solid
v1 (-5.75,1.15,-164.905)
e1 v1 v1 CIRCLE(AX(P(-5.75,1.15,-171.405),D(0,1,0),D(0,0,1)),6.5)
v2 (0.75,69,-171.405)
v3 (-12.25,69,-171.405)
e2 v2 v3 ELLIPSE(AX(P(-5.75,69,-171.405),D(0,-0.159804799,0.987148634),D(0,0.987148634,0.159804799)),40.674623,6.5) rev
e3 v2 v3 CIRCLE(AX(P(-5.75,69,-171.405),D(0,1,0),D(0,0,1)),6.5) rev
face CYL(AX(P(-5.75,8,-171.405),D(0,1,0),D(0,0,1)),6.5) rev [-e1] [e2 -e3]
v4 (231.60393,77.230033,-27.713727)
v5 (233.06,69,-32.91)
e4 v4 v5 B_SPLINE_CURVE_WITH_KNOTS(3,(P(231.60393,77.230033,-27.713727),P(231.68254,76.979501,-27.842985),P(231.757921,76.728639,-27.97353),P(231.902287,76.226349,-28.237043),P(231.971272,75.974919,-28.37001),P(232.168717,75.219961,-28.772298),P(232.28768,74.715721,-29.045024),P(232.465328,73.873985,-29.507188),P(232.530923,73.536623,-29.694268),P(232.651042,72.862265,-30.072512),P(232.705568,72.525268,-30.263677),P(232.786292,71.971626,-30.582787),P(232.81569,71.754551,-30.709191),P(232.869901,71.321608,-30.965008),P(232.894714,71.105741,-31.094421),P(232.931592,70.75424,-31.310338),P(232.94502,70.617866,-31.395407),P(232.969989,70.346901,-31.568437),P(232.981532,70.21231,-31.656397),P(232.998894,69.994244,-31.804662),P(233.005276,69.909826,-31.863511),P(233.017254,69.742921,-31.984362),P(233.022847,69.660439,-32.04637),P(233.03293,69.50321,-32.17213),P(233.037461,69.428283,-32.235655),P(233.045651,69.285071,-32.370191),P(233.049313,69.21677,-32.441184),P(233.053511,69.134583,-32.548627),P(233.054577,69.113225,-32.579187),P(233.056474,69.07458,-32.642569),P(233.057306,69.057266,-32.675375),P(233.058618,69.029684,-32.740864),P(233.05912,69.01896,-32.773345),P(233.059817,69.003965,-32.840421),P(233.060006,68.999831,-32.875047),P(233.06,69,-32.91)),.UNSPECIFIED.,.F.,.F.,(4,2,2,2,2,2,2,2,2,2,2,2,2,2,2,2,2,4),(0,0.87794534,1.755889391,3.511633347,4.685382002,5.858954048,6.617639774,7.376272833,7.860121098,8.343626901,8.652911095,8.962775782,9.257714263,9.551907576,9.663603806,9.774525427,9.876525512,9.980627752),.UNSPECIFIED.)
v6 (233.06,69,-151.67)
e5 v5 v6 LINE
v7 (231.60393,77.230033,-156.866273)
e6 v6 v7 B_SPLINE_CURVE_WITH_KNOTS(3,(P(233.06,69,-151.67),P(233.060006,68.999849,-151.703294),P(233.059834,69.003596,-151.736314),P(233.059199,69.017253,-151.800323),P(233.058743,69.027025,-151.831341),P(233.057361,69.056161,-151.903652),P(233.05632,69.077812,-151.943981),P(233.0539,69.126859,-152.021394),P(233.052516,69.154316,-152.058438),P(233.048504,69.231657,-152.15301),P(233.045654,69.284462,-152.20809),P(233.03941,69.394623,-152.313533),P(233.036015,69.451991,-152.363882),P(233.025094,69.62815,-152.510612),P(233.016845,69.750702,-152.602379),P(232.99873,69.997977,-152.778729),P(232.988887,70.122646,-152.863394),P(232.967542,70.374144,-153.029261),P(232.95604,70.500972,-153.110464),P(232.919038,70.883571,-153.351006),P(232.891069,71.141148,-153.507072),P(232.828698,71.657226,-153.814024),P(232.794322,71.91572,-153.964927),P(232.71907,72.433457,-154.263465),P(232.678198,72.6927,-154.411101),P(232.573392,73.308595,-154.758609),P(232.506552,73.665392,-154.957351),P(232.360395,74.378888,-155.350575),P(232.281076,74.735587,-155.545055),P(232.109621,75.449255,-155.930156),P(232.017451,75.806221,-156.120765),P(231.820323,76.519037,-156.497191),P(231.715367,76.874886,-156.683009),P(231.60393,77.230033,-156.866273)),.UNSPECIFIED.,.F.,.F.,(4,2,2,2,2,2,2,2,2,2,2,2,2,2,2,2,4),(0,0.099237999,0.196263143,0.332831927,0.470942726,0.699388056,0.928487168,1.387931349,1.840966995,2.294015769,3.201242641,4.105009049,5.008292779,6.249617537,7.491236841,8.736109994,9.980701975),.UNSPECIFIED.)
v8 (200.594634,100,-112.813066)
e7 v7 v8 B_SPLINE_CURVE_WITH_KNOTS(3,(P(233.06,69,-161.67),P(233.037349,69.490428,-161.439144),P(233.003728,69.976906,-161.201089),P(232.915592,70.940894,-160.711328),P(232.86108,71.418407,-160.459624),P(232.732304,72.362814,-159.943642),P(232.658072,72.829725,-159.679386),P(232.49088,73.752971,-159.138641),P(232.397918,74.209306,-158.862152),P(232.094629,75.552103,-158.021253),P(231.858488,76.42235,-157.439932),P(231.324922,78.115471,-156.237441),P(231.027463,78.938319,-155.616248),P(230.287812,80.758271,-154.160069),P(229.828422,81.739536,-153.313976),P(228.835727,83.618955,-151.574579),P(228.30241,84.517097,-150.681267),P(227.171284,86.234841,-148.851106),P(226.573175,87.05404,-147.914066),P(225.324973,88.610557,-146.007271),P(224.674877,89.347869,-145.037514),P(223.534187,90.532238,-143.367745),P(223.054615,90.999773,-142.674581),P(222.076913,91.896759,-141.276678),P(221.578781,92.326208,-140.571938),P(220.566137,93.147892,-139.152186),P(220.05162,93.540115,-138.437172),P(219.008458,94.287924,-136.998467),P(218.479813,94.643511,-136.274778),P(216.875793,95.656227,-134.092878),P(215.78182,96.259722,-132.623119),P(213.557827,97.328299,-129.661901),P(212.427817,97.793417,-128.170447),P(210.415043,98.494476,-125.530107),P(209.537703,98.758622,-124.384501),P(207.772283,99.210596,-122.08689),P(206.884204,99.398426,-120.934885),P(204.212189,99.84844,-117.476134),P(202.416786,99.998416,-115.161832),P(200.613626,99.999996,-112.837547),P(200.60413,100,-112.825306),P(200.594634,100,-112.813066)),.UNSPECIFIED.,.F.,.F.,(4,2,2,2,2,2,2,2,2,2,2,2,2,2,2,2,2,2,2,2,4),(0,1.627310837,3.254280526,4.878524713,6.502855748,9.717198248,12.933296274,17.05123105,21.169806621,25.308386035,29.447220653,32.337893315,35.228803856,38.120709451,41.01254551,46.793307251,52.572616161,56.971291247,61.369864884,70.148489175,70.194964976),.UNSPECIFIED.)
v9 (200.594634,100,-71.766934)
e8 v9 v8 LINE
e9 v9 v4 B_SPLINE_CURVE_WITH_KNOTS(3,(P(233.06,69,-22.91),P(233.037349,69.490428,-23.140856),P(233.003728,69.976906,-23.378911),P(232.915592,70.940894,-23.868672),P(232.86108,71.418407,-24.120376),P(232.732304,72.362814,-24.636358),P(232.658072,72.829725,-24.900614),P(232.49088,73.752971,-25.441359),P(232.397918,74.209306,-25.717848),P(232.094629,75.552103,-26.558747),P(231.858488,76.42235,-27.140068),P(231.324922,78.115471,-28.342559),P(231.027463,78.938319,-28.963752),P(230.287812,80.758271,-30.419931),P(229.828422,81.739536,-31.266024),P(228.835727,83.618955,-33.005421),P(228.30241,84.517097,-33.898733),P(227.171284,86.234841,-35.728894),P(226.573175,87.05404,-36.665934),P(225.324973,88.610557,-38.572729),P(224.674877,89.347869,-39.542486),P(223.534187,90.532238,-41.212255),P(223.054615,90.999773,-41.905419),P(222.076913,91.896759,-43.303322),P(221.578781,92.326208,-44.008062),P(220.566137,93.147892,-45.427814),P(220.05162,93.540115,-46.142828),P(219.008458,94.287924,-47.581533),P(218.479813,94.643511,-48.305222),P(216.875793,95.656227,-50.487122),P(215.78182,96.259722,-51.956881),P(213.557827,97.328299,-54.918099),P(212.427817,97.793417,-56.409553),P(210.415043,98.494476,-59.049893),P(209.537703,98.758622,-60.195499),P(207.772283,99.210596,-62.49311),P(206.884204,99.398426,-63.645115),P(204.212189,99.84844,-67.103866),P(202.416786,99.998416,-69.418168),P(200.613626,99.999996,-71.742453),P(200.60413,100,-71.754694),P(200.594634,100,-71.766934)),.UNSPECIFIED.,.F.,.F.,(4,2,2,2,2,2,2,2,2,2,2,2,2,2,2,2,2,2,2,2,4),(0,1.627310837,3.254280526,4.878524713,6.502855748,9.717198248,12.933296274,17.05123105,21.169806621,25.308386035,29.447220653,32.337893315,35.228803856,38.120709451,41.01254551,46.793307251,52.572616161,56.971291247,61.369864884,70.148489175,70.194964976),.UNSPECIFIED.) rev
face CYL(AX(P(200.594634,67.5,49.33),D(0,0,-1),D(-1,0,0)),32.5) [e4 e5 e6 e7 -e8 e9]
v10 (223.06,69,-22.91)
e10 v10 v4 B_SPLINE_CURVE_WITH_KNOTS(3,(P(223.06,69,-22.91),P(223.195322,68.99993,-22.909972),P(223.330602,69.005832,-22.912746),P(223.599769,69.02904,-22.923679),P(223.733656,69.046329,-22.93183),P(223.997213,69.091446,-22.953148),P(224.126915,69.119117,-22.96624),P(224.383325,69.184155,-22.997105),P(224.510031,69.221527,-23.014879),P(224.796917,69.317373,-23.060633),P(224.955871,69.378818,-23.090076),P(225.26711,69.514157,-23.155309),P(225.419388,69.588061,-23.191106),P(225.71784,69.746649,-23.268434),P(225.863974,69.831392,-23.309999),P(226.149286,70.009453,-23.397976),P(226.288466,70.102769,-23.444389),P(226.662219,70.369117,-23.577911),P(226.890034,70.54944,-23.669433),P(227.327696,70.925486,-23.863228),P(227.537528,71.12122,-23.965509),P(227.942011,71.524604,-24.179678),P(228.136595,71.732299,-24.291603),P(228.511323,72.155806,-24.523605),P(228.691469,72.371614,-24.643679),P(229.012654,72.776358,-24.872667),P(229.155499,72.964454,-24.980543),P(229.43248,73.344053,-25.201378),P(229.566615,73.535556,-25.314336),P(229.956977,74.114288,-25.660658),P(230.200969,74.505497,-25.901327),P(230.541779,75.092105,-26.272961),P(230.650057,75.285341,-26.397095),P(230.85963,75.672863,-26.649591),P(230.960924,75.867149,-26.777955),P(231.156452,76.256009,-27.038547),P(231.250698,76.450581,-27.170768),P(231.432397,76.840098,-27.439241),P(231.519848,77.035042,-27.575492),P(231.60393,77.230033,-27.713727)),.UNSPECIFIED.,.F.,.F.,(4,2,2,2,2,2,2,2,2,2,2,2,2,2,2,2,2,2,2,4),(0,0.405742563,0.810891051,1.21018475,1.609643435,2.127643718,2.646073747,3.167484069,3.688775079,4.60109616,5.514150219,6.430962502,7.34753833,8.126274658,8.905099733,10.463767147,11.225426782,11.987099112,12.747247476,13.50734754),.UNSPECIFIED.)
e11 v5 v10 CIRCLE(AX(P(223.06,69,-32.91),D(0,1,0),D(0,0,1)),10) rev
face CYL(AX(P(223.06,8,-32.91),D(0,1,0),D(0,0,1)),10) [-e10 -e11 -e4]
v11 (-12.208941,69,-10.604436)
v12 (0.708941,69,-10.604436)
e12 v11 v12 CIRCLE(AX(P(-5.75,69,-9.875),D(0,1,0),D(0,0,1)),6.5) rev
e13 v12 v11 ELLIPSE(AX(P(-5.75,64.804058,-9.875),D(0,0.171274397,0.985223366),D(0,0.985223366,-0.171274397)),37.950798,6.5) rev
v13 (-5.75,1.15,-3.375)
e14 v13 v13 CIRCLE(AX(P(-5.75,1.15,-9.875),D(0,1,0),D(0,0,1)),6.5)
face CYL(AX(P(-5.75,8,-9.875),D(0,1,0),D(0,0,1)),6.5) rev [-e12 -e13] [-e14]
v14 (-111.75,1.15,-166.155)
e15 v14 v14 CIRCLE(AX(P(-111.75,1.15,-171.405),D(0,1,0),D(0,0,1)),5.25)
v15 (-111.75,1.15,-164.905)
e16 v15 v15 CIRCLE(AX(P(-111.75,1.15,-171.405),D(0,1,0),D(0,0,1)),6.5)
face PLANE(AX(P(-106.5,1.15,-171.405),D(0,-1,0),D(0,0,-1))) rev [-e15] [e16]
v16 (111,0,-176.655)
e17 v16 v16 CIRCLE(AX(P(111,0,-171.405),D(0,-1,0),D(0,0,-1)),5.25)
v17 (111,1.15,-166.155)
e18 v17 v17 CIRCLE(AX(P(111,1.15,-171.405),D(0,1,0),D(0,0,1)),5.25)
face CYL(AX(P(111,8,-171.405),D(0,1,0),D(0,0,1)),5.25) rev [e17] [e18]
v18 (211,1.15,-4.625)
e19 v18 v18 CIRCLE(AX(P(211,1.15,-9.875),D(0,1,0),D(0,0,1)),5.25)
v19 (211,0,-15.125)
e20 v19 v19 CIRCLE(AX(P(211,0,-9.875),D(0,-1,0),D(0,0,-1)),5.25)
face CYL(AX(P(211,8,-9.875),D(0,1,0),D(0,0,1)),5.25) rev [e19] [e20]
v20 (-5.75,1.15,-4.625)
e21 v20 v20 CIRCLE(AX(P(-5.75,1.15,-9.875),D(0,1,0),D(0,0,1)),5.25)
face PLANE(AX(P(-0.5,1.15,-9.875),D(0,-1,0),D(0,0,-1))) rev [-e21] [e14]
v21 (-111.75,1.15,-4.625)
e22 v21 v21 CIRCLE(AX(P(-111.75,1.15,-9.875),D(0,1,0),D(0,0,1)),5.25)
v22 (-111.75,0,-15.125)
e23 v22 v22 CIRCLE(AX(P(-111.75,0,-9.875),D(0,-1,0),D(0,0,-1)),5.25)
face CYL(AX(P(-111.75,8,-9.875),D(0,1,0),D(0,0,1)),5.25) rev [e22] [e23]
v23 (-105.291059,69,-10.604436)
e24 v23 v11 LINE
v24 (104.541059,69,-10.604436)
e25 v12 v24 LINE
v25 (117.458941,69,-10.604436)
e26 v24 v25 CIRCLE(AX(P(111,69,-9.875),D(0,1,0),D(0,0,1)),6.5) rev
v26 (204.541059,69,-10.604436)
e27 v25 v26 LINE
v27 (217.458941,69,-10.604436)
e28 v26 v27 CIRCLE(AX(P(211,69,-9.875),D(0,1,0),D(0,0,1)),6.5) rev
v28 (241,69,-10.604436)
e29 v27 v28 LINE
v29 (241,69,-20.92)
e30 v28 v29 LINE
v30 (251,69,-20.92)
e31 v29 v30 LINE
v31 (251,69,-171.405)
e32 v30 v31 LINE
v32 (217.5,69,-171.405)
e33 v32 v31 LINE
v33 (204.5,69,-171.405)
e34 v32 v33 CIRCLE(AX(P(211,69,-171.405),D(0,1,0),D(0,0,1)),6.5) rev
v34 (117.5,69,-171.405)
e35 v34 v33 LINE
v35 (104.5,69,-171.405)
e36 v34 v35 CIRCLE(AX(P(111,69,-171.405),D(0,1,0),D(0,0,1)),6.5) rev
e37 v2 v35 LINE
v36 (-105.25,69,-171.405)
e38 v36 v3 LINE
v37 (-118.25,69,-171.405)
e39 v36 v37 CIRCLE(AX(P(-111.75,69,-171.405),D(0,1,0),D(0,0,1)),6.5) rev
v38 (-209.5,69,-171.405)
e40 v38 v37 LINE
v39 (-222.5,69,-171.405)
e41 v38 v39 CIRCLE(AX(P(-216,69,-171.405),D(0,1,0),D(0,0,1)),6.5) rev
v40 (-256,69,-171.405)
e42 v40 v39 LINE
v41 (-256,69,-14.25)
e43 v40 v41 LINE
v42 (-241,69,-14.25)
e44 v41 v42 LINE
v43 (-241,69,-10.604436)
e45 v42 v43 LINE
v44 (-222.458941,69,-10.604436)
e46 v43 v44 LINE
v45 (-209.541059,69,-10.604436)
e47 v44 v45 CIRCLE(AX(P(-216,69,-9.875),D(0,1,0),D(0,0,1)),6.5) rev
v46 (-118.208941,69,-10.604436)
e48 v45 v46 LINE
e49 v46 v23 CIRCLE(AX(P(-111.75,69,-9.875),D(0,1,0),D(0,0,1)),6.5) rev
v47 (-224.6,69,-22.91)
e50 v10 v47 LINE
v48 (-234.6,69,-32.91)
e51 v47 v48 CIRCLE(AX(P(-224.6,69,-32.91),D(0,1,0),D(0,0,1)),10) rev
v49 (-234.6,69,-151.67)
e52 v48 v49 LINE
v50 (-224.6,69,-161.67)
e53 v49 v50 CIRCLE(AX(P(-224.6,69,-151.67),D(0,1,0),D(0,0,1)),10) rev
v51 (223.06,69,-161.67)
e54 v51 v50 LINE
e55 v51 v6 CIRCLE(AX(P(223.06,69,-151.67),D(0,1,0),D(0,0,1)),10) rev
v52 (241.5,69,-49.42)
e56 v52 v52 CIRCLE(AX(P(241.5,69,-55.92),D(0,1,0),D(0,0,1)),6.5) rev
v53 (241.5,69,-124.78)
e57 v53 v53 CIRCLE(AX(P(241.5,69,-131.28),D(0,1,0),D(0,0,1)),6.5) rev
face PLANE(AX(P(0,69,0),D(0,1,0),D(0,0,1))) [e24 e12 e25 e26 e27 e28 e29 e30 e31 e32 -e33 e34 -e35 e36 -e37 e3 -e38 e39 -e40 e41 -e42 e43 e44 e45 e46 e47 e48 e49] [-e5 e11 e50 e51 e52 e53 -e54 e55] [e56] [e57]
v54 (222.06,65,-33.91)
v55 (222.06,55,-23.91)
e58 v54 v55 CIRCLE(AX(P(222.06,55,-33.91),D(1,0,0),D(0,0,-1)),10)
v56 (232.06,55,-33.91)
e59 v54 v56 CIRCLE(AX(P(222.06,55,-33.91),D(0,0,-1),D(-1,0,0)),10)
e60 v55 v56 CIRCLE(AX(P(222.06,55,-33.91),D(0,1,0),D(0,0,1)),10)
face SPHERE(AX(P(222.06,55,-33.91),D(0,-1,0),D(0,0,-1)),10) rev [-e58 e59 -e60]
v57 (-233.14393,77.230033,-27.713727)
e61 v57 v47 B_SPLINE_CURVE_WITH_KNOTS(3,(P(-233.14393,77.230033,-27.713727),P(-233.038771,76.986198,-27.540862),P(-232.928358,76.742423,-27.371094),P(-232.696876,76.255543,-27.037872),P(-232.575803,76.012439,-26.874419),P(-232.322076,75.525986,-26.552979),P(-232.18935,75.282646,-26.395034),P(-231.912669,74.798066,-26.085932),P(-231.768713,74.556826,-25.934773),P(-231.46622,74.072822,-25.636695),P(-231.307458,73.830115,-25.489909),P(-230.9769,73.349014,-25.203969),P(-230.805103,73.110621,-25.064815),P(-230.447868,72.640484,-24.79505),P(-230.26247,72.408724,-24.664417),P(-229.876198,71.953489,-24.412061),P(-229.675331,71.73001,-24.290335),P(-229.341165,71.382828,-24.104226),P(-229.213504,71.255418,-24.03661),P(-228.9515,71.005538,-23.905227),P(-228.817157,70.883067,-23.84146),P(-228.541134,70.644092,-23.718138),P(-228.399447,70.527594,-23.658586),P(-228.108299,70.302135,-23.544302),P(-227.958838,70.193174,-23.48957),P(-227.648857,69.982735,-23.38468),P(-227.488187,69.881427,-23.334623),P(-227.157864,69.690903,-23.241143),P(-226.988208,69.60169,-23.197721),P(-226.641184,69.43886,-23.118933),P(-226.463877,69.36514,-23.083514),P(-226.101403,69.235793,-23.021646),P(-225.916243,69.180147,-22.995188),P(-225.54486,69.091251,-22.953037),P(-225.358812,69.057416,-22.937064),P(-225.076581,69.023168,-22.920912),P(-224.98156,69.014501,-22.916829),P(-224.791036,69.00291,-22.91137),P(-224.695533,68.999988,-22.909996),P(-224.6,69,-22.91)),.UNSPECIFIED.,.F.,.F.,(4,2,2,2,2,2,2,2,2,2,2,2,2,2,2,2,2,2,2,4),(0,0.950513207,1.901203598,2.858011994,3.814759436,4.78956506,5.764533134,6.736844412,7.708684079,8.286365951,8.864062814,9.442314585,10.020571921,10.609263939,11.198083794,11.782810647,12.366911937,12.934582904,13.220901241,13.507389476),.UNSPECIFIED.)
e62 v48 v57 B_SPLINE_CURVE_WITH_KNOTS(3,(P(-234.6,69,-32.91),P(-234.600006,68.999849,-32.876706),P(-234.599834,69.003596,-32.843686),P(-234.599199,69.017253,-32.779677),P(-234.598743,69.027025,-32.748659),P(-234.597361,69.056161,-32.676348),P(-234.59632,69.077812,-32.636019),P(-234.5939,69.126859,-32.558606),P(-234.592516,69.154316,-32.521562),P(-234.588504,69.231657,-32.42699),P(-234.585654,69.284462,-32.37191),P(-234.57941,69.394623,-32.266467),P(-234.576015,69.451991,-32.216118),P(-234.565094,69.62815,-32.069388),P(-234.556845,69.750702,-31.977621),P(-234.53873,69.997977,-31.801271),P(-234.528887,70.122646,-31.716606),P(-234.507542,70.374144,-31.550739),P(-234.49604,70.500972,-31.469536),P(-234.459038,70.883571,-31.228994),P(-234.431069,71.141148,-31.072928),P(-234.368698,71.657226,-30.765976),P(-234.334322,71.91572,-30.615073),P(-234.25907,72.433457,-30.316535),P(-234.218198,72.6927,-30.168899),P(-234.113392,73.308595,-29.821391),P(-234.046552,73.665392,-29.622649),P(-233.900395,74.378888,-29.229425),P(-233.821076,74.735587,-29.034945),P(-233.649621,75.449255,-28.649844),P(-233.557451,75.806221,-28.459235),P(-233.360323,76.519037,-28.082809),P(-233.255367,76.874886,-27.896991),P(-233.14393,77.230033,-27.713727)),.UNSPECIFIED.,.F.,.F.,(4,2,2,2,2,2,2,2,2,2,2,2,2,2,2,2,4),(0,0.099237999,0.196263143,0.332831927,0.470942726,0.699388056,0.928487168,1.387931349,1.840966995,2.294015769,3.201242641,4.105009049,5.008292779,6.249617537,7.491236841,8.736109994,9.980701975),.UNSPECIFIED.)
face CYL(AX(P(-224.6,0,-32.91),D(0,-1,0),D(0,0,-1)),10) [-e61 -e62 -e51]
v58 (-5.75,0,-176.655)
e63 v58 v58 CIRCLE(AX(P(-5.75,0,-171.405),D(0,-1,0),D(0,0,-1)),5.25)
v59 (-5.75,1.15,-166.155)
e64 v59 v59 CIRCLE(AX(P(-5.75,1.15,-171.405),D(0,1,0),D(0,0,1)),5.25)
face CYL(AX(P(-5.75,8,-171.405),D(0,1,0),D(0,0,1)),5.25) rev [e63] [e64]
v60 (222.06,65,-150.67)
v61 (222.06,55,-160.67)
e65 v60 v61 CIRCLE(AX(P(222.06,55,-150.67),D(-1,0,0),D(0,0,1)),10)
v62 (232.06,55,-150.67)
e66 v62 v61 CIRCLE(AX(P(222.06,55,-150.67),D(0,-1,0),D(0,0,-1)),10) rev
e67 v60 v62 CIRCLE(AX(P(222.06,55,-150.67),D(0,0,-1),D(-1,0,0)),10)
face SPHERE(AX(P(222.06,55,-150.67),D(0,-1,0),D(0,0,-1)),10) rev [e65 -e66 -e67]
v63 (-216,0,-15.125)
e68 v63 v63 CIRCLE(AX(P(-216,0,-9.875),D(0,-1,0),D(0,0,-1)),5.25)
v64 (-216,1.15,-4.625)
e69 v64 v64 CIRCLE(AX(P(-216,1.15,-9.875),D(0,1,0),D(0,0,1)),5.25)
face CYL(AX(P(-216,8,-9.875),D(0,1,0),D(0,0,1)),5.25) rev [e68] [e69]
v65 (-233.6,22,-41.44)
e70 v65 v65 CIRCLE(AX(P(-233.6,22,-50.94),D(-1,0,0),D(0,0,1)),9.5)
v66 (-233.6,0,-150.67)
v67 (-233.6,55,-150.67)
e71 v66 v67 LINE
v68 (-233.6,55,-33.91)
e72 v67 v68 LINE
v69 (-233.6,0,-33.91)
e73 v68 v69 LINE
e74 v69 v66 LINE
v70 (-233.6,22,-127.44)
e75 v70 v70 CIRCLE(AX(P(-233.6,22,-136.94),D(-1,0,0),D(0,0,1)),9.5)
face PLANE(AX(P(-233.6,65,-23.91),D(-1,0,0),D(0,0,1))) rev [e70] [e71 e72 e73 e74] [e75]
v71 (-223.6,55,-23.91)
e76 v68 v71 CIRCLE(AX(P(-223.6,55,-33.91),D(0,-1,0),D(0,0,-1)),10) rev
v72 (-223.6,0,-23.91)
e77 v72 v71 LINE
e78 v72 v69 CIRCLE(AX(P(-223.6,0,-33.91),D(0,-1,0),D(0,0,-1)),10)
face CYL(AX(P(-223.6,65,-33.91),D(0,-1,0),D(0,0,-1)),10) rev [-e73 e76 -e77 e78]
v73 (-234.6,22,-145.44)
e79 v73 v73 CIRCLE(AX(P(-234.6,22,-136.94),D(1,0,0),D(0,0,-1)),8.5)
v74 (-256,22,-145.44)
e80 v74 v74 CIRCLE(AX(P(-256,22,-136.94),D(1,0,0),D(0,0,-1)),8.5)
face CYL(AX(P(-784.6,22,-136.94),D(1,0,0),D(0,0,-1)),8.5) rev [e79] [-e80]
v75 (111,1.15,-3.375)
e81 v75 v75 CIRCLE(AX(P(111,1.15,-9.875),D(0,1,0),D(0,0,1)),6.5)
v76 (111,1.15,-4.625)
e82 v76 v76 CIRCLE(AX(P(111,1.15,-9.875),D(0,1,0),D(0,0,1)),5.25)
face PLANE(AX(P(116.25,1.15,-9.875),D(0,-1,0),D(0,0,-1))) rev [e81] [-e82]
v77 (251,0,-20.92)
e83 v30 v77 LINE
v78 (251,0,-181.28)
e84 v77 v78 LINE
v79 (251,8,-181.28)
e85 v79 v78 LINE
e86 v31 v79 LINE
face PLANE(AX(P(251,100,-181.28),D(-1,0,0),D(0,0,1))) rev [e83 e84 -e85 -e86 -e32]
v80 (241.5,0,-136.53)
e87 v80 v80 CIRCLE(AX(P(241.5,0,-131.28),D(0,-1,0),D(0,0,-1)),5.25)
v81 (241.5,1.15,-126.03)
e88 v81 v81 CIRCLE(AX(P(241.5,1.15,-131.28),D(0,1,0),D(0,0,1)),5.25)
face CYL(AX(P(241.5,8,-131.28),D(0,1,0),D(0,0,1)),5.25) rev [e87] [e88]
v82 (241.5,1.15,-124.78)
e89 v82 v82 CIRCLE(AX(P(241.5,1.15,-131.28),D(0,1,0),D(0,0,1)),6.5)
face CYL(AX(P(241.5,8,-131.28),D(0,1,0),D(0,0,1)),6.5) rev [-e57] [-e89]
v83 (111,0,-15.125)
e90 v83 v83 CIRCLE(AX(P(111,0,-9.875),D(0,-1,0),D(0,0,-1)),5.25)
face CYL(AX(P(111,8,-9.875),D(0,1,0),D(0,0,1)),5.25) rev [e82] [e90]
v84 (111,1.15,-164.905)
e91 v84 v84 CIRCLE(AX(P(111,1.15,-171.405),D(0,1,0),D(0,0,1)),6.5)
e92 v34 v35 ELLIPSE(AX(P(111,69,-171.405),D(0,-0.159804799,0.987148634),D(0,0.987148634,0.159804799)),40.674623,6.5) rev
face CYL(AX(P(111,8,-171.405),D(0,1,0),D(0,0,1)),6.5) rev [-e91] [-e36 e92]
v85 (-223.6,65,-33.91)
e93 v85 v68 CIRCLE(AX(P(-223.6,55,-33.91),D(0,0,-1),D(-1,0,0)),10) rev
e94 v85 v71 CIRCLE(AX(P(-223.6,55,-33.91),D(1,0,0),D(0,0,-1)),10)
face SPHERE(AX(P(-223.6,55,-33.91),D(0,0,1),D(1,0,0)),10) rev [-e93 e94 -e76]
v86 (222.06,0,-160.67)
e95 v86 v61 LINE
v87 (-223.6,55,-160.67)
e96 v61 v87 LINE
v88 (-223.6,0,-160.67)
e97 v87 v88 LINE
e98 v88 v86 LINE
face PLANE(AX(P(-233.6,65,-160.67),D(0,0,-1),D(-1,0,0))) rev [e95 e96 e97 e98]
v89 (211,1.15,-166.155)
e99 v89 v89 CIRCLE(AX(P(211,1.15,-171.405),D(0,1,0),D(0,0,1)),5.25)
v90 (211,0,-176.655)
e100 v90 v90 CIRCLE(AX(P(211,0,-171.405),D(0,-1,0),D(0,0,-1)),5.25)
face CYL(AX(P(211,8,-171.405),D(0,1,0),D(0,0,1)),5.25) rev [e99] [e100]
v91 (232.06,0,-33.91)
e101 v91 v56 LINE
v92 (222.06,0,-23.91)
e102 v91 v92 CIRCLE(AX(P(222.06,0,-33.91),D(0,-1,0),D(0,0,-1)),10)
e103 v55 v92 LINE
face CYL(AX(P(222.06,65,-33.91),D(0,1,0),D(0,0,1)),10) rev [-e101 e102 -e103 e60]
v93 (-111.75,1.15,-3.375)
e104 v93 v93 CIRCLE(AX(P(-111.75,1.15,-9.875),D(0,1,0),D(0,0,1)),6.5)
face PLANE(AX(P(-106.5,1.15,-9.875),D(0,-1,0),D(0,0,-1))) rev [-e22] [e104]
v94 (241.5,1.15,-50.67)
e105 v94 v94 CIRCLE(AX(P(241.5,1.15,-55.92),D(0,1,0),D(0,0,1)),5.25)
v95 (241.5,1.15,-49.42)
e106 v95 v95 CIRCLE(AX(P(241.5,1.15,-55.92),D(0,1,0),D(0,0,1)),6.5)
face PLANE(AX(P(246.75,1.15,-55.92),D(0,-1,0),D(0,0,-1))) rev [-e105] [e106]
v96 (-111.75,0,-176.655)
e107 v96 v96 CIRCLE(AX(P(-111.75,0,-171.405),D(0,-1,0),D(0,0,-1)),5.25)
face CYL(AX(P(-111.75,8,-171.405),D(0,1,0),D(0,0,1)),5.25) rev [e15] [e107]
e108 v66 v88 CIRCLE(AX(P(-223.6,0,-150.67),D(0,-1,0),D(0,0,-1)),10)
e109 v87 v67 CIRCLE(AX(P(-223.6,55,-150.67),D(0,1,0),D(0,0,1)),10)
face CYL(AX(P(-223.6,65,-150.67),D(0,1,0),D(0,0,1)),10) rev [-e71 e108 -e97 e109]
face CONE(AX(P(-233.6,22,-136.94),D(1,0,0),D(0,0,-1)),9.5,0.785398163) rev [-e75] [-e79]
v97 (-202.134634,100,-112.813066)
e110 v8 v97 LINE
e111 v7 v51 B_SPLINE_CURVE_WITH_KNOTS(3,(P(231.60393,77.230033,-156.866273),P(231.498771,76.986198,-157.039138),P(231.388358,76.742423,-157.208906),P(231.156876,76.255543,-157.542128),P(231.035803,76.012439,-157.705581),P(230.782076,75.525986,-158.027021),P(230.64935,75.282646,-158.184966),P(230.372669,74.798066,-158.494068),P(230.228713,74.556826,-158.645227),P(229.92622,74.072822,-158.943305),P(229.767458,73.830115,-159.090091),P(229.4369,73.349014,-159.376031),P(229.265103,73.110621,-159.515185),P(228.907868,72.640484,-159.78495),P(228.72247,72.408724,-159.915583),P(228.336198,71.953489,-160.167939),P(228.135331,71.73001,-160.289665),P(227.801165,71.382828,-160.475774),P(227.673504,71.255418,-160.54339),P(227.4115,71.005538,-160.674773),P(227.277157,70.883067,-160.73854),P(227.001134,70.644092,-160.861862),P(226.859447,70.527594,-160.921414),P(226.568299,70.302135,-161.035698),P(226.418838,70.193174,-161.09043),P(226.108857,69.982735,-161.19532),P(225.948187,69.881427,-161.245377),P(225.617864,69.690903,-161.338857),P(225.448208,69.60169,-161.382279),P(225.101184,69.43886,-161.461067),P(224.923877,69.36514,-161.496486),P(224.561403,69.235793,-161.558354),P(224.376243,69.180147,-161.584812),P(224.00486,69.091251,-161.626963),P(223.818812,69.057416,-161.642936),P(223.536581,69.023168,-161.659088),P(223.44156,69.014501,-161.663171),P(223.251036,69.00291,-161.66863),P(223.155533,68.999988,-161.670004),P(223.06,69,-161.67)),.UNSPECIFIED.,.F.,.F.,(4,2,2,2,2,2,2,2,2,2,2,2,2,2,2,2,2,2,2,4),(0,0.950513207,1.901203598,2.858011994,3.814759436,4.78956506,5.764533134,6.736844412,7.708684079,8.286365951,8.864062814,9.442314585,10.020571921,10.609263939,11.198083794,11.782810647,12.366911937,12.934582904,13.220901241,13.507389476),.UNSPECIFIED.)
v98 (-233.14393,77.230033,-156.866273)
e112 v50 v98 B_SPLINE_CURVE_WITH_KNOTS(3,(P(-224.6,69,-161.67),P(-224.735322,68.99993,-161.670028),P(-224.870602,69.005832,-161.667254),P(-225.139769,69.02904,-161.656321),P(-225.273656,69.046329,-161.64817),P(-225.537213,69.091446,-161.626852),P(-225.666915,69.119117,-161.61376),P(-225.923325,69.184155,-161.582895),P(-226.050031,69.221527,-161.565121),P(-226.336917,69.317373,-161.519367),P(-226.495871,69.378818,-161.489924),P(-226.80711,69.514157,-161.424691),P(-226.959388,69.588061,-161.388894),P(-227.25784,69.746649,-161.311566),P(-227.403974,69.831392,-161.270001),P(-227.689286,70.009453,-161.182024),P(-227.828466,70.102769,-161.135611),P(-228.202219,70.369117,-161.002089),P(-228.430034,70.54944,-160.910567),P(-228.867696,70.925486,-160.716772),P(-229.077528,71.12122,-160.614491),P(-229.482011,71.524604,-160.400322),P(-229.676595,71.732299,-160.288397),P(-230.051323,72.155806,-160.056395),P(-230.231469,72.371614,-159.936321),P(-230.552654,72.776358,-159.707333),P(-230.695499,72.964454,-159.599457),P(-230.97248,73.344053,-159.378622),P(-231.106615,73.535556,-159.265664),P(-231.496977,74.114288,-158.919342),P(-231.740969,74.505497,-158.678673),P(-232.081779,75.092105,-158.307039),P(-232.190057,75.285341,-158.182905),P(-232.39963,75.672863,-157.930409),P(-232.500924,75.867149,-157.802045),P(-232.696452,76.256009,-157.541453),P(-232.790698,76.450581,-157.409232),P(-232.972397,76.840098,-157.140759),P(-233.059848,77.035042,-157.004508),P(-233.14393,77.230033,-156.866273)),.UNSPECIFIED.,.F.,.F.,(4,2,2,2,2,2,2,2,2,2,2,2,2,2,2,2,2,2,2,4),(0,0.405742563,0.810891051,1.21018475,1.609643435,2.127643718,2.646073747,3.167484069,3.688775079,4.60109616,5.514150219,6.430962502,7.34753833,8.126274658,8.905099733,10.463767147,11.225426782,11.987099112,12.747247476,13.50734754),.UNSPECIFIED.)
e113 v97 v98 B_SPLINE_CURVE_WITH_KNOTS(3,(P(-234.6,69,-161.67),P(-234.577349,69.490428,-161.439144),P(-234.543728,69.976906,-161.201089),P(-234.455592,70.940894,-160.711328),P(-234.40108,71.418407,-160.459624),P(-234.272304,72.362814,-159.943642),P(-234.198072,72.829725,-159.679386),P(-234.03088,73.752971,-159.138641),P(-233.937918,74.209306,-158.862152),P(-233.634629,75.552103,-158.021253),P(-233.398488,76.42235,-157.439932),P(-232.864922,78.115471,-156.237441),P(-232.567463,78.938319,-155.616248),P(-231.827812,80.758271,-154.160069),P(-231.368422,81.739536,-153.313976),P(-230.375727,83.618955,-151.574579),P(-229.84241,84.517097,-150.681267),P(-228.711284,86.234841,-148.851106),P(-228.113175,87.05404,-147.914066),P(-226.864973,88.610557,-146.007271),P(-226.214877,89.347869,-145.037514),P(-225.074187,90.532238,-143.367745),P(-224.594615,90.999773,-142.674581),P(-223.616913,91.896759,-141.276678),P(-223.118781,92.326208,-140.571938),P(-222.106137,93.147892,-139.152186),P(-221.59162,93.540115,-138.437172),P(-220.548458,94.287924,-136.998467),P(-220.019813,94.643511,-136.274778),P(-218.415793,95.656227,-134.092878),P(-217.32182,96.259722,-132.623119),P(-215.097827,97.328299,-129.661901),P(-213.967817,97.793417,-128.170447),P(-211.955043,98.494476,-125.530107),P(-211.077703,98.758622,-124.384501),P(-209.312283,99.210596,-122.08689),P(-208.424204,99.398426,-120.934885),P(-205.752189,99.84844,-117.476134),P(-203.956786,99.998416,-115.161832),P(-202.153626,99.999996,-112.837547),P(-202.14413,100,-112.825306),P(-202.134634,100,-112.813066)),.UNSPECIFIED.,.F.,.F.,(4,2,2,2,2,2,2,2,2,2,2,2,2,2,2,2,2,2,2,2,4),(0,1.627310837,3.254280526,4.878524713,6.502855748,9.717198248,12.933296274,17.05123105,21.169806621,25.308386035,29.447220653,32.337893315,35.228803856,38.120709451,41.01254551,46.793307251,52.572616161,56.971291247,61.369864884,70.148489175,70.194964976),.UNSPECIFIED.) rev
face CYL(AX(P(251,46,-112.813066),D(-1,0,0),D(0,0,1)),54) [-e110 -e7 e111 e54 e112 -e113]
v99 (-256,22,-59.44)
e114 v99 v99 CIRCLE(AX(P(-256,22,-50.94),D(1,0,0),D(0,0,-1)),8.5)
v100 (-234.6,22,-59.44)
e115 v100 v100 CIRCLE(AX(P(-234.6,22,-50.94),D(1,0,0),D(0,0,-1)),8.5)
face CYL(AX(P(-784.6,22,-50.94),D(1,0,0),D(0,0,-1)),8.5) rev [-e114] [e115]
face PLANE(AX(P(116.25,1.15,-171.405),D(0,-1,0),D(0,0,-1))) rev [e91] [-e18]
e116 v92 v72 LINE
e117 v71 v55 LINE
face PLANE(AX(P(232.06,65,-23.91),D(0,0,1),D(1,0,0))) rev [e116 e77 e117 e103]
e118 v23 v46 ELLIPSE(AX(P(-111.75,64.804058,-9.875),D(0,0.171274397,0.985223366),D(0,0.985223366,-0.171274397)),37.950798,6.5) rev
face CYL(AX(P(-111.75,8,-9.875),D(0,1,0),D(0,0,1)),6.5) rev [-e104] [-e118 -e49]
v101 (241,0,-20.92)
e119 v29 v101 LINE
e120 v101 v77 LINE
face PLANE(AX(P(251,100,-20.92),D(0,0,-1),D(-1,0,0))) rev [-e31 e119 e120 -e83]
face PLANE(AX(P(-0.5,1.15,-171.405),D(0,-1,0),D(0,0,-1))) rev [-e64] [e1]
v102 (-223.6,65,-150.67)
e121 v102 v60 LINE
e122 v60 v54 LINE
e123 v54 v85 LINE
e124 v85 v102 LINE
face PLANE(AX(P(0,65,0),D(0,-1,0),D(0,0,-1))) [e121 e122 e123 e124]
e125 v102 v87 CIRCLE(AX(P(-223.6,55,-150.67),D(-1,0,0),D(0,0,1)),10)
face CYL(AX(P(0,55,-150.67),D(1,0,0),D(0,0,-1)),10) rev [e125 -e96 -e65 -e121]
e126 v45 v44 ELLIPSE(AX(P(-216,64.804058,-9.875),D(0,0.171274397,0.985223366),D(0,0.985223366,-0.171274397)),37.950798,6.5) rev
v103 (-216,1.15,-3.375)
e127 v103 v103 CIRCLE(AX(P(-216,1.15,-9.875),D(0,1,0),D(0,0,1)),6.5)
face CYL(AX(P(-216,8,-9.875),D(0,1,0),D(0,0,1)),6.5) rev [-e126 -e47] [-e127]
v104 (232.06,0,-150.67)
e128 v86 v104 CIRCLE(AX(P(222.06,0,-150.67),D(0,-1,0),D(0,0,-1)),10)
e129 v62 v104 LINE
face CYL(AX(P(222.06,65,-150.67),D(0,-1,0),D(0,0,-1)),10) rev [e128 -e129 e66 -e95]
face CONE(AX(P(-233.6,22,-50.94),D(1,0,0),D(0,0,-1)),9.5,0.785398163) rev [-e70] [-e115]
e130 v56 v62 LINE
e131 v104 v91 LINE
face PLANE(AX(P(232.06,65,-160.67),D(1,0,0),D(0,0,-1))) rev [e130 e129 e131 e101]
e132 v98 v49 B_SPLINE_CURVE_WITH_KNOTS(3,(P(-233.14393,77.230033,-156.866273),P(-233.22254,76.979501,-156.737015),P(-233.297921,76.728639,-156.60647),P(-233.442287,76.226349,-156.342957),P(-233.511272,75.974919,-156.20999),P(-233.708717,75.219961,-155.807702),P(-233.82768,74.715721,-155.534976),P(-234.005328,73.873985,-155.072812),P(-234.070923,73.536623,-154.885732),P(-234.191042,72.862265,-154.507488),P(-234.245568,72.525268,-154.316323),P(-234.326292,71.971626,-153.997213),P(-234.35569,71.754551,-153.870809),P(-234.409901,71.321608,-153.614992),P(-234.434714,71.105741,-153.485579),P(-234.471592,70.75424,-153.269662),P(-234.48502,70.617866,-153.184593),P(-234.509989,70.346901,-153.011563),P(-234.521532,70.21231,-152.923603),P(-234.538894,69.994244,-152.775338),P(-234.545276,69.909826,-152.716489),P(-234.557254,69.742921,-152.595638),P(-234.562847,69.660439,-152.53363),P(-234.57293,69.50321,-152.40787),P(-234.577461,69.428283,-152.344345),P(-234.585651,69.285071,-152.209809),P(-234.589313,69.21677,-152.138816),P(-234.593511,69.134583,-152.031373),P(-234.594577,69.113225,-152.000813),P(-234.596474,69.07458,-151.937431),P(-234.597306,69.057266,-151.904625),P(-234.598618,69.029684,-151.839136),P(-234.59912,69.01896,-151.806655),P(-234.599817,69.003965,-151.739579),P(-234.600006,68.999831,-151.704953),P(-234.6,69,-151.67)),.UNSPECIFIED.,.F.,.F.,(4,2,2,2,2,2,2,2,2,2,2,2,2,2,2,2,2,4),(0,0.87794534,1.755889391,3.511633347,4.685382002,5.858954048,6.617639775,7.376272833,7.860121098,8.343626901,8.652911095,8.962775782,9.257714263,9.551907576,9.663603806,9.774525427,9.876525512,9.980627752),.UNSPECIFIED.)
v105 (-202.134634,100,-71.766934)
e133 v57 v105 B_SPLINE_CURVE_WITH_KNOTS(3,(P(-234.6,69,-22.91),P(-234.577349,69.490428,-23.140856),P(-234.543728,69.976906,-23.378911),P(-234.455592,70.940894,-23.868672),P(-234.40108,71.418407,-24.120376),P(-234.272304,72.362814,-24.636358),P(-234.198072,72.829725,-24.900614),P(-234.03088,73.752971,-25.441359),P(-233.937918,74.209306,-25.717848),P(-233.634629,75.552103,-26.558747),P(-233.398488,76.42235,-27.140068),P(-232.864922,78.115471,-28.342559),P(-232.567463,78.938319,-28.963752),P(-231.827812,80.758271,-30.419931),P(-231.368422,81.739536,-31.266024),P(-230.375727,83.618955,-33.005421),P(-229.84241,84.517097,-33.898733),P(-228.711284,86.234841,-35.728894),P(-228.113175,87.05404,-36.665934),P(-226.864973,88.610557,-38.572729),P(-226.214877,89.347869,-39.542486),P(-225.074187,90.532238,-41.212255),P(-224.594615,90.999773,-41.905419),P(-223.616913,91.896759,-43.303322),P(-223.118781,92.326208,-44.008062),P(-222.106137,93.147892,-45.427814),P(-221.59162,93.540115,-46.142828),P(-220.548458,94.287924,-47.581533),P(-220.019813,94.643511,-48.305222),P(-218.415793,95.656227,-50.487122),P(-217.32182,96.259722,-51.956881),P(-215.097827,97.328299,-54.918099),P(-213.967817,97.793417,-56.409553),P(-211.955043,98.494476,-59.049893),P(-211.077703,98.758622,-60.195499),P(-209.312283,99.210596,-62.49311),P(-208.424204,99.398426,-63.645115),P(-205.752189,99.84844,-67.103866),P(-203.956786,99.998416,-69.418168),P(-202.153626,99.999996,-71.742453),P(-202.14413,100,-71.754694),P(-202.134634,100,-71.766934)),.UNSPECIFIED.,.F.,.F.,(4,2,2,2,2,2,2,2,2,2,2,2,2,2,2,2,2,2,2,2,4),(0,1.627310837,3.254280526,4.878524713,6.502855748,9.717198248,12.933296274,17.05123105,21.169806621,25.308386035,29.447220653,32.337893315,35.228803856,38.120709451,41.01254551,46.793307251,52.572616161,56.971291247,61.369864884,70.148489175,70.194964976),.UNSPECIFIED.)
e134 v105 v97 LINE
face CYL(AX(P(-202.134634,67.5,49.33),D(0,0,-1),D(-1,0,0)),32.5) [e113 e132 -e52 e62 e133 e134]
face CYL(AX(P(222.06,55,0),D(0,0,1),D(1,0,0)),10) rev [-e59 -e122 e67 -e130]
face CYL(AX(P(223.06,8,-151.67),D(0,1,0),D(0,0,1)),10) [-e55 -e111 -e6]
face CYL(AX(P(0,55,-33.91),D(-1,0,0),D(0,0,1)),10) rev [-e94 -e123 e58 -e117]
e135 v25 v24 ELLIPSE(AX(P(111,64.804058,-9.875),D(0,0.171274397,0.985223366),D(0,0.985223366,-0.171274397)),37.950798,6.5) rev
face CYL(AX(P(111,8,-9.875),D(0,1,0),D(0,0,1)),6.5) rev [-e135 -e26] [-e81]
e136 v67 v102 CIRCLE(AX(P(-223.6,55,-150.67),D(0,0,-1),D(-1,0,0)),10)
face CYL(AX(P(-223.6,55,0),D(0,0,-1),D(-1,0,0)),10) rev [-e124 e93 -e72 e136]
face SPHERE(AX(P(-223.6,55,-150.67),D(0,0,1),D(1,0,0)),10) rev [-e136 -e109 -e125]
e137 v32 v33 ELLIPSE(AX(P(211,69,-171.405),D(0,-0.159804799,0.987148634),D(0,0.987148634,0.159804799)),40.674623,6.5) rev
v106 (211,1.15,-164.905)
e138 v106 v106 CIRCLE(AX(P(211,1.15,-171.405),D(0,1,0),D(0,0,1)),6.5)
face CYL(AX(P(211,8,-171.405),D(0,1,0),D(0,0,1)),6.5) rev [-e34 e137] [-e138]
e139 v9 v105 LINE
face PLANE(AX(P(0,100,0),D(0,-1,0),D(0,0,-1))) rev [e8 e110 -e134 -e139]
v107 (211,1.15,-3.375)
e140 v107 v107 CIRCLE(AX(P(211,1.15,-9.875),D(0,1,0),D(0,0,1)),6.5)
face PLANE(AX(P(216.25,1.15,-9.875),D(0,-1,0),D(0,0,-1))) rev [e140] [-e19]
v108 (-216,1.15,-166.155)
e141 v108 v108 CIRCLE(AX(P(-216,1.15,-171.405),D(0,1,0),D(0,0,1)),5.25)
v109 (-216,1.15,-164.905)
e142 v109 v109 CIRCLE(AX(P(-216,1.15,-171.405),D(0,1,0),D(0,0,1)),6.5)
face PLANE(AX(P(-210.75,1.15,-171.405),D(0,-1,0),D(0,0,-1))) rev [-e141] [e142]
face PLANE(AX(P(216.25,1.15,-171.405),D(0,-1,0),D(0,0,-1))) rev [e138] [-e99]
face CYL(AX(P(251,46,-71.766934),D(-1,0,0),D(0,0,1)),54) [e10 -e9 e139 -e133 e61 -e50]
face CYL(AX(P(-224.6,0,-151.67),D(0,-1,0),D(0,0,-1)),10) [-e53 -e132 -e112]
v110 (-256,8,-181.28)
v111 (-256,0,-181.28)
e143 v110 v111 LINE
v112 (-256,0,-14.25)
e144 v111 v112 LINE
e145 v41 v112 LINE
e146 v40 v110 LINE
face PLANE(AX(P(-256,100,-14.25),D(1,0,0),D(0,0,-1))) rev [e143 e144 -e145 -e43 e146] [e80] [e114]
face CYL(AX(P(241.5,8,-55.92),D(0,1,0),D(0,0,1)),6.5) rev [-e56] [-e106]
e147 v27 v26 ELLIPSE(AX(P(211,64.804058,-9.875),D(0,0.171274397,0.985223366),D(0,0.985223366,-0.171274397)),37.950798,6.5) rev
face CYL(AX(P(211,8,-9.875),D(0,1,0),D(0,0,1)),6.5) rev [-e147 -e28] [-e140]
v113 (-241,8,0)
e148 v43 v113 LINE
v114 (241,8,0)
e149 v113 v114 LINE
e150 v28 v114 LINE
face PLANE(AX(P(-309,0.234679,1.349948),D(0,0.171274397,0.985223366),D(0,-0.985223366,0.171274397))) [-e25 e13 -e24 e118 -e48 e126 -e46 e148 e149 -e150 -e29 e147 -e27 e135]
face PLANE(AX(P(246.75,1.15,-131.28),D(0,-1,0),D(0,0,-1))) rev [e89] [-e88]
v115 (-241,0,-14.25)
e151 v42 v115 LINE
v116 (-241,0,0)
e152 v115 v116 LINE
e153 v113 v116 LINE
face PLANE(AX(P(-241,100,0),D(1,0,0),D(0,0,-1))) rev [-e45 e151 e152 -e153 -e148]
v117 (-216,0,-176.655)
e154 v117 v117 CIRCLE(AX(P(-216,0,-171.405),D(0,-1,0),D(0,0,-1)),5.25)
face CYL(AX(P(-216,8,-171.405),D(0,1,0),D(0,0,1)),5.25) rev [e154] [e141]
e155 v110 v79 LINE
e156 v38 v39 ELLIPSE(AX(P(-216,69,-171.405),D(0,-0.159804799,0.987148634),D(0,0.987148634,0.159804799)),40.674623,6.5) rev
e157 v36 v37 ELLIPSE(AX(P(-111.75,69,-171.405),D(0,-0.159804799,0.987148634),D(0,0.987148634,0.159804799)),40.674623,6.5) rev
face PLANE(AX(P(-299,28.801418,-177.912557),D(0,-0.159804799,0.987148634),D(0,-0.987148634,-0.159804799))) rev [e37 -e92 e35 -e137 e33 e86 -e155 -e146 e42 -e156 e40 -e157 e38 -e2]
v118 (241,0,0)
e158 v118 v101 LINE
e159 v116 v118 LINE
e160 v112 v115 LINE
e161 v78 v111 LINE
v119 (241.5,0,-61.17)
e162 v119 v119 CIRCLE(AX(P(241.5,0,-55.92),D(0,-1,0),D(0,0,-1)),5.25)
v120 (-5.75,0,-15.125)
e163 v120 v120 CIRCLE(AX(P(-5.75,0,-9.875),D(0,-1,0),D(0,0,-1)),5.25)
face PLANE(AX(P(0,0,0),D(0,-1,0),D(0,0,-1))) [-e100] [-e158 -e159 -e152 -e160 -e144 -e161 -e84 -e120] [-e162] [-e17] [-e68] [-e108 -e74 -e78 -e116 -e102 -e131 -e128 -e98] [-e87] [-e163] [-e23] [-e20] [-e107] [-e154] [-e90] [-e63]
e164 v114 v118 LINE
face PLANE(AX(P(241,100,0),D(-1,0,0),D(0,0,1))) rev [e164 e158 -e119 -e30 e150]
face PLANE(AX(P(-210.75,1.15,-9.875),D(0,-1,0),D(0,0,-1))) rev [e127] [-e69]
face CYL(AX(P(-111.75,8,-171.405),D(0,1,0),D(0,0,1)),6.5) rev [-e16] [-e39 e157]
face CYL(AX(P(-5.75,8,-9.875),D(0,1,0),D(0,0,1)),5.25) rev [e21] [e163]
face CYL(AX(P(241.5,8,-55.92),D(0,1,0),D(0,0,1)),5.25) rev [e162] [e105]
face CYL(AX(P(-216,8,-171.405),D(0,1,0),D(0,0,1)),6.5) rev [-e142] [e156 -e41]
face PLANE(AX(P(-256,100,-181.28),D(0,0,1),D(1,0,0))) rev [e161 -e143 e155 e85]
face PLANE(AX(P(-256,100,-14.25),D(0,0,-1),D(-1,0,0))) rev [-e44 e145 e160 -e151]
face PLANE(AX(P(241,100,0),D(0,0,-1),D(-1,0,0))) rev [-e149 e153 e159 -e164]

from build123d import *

# Parameters (mm, degrees)
SALIENTE_EXTRUIR1_DEPTH                              = 100
CROQUIS3_W                                           = 19.61
CROQUIS3_H                                           = 92
CROQUIS3_W_2                                         = 14.25
CORTAR_EXTRUIR2_DEPTH                                = 1047
CROQUIS4_W                                           = 21.4
CROQUIS4_H                                           = 92
CORTAR_EXTRUIR3_DEPTH                                = 1047
CROQUIS5_W                                           = 17.94
CROQUIS5_H                                           = 92
CORTAR_EXTRUIR4_DEPTH                                = 1047
CROQUIS6_W                                           = 465.66
CROQUIS6_H                                           = 136.76
CORTAR_EXTRUIR5_DEPTH                                = 65
REFRENTADO_PARA_PERNO_CON_CABEZA_HEXAGON_D           = 10.5
REFRENTADO_PARA_PERNO_CON_CABEZA_HEXAGON_DEPTH       = 90
REFRENTADO_PARA_PERNO_CON_CABEZA_HEXAGON_CBORE_D     = 13
REFRENTADO_PARA_PERNO_CON_CABEZA_HEXAGON_CBORE_DEPTH = 6.85
REFRENTADO_PARA_PERNO_CON_CABEZA_HEXAGON_TIP         = 3.15451825
CROQUIS11_R                                          = 8.5
CORTAR_EXTRUIR6_DEPTH                                = 211
CORTAR_EXTRUIR7_DEPTH                                = 528.891843468
CORTAR_EXTRUIR9_DEPTH                                = 211
REDONDEO1_R                                          = 10
REDONDEO2_R                                          = 10
REDONDEO3_R                                          = 10
REDONDEO4_R                                          = 10
CHAFL_N1_SIZE                                        = 1
REDONDEO5_R                                          = 10
SALIENTE_EXTRUIR2_START                              = 61
CROQUIS14_R                                          = 6.5
SALIENTE_EXTRUIR2_DEPTH                              = 61
CORTAR_EXTRUIR10_DEPTH                               = 550
CORTAR_EXTRUIR11_DEPTH                               = 550
CORTAR_EXTRUIR12_START                               = -550
CROQUIS18_R                                          = 8.5
CORTAR_EXTRUIR12_DEPTH                               = 550


# Some blends are built 0.0001 mm under size
with BuildPart() as part:
    # Croquis2 → Saliente-Extruir1 (new body)
    with BuildSketch(Plane(origin=(0, 0, 0), x_dir=(1, 0, 0), z_dir=(0, 1, 0))):
        Polygon((-256, 14.25), (-256, 181.28), (251, 181.28), (251, 20.92), (241, 20.92), (241, 0), (-241, 0), (-241, 14.25), align=None)
    extrude(amount=SALIENTE_EXTRUIR1_DEPTH)

    # Croquis3 → Cortar-Extruir2 (cut)
    with BuildSketch(Plane.ZY.offset(256)):
        with Locations((-171.475, 54)):
            Rectangle(CROQUIS3_W, CROQUIS3_H)
        with Locations((-7.125, 54)):
            Rectangle(CROQUIS3_W_2, CROQUIS3_H)
        Polygon((-14.25, 100), (-20.92, 100), (-22.91, 100), (-22.91, 8), (-14.25, 8), align=None)
    extrude(amount=-CORTAR_EXTRUIR2_DEPTH, mode=Mode.SUBTRACT)

    # Croquis4 → Cortar-Extruir3 (cut)
    with BuildSketch(Plane(origin=(0, 0, -161.67), x_dir=(-1, 0, 0), z_dir=(0, 0, -1))):
        with Locations((245.3, 54)):
            Rectangle(CROQUIS4_W, CROQUIS4_H)
    extrude(amount=-CORTAR_EXTRUIR3_DEPTH, mode=Mode.SUBTRACT)

    # Croquis5 → Cortar-Extruir4 (cut)
    with BuildSketch(Plane(origin=(0, 0, -161.67), x_dir=(-1, 0, 0), z_dir=(0, 0, -1))):
        with Locations((-242.03, 54)):
            Rectangle(CROQUIS5_W, CROQUIS5_H)
    extrude(amount=-CORTAR_EXTRUIR4_DEPTH, mode=Mode.SUBTRACT)

    # Croquis6 → Cortar-Extruir5 (cut)
    with BuildSketch(Plane.XZ):
        with Locations((-0.77, -92.29)):
            Rectangle(CROQUIS6_W, CROQUIS6_H)
    extrude(amount=-CORTAR_EXTRUIR5_DEPTH, mode=Mode.SUBTRACT)

    # Refrentado para perno con cabeza hexagonal de M101
    with Locations(Plane(origin=(-216, 8, -9.875), x_dir=(0, 0, 1), z_dir=(0, 1, 0))):
        with Locations((0, 0), (0, 104.25), (0, 210.25), (0, 327), (0, 427), (-46.045, 457.5), (-121.405, 457.5), (-161.53, 427), (-161.53, 327), (-161.53, 210.25), (-161.53, 104.25), (-161.53, 0)):
            CounterBoreHole(REFRENTADO_PARA_PERNO_CON_CABEZA_HEXAGON_D / 2, REFRENTADO_PARA_PERNO_CON_CABEZA_HEXAGON_CBORE_D / 2, REFRENTADO_PARA_PERNO_CON_CABEZA_HEXAGON_CBORE_DEPTH, depth=REFRENTADO_PARA_PERNO_CON_CABEZA_HEXAGON_DEPTH)
            with Locations((0, 0, -(REFRENTADO_PARA_PERNO_CON_CABEZA_HEXAGON_DEPTH + REFRENTADO_PARA_PERNO_CON_CABEZA_HEXAGON_TIP / 2))):  # 118° drill point
                Cone(0, REFRENTADO_PARA_PERNO_CON_CABEZA_HEXAGON_D / 2, REFRENTADO_PARA_PERNO_CON_CABEZA_HEXAGON_TIP, mode=Mode.SUBTRACT)

    # Croquis11 → Cortar-Extruir6 (cut)
    with BuildSketch(Plane.ZY.offset(234.6)):
        with Locations((-136.94, 22)):
            Circle(CROQUIS11_R)
        with Locations((-50.94, 22)):
            Circle(CROQUIS11_R)
    extrude(amount=-CORTAR_EXTRUIR6_DEPTH, mode=Mode.SUBTRACT)

    # Croquis12 → Cortar-Extruir7 (cut, through all)
    with BuildSketch(Plane.ZY.offset(234.6)):
        with BuildLine():
            ThreePointArc((-161.67, 69), (-141.744018282, 91.596052461), (-112.813065999, 100))
            Line((-112.813065999, 100), (-161.67, 100))
            Line((-161.67, 100), (-161.67, 69))
        make_face()
        with BuildLine():
            Line((-22.91, 100), (-71.766934001, 100))
            ThreePointArc((-71.766934001, 100), (-42.835981718, 91.596052461), (-22.91, 69))
            Line((-22.91, 69), (-22.91, 100))
        make_face()
    extrude(amount=-CORTAR_EXTRUIR7_DEPTH, mode=Mode.SUBTRACT)

    # Croquis13 → Cortar-Extruir9 (cut)
    with BuildSketch(Plane(origin=(0, 0, -161.67), x_dir=(-1, 0, 0), z_dir=(0, 0, -1))):
        with BuildLine():
            Line((-200.594633839, 100), (-233.06, 100))
            Line((-233.06, 100), (-233.06, 69))
            ThreePointArc((-233.06, 69), (-223.039009526, 91.005318547), (-200.594633839, 100))
        make_face()
        with BuildLine():
            Line((234.6, 69), (234.6, 100))
            Line((234.6, 100), (202.134633839, 100))
            ThreePointArc((202.134633839, 100), (224.579009526, 91.005318547), (234.6, 69))
        make_face()
    extrude(amount=-CORTAR_EXTRUIR9_DEPTH, mode=Mode.SUBTRACT)

    # Redondeo1
    redondeo1_edges = [part.edges().sort_by_distance(p)[0] for p in [
        (-233.6, 65, -92.29),
        (-233.6, 32.5, -160.67),
        (-233.6, 32.5, -23.91),
    ]]
    fillet(redondeo1_edges, radius=REDONDEO1_R)

    # Redondeo2
    redondeo2_edges = [part.edges().sort_by_distance(p)[0] for p in [
        (232.06, 32.5, -23.91),
    ]]
    fillet(redondeo2_edges, radius=REDONDEO2_R)

    # Redondeo3
    redondeo3_edges = [part.edges().sort_by_distance(p)[0] for p in [
        (232.06, 32.5, -160.67),
    ]]
    fillet(redondeo3_edges, radius=REDONDEO3_R)

    # Redondeo4
    # the kernel refuses this fillet: 10 mm, written as the material it adds along each edge
    with BuildSketch(Plane(origin=(-223.6, 55, -33.91), x_dir=(0, 1, 0), z_dir=(0, 0, 1))) as redondeo4_piece_1_section:
        Polygon((0, 0), (REDONDEO4_R, 0), (REDONDEO4_R, REDONDEO4_R), (0, REDONDEO4_R), align=None)
    redondeo4_piece_1 = extrude(amount=REDONDEO4_R, mode=Mode.PRIVATE)
    redondeo4_piece_1 = redondeo4_piece_1 - Plane(origin=(-223.6, 55, -33.91), x_dir=(0.7071067811865475, -0.7071067811865475, 0), z_dir=(0, 0, 1)) * Sphere(REDONDEO4_R, mode=Mode.PRIVATE)
    add(redondeo4_piece_1)
    with BuildSketch(Plane(origin=(-223.6, 55, -150.67), x_dir=(0, 1, 0), z_dir=(0, 0, -1))) as redondeo4_piece_2_section:
        Polygon((0, 0), (REDONDEO4_R, 0), (REDONDEO4_R, -REDONDEO4_R), (0, -REDONDEO4_R), align=None)
    redondeo4_piece_2 = extrude(amount=REDONDEO4_R, mode=Mode.PRIVATE)
    redondeo4_piece_2 = redondeo4_piece_2 - Plane(origin=(-223.6, 55, -150.67), x_dir=(0.7071067811865475, -0.7071067811865475, 0), z_dir=(0, 0, -1)) * Sphere(REDONDEO4_R, mode=Mode.PRIVATE)
    add(redondeo4_piece_2)
    with BuildSketch(Plane(origin=(-223.6, 65, -160.67), x_dir=(0, -1, 0), z_dir=(1, 0, 0)), Plane(origin=(222.06, 65, -23.91), x_dir=(0, -1, 0), z_dir=(-1, 0, 0))) as redondeo4_piece_3:
        with BuildLine():
            CenterArc((REDONDEO4_R, -REDONDEO4_R), REDONDEO4_R, 90, 90)
            Line((0, -REDONDEO4_R), (0, 0))
            Line((0, 0), (REDONDEO4_R, 0))
        make_face()
    extrude(amount=445.66)
    with BuildSketch(Plane(origin=(222.06, 65, -33.91), x_dir=(1, 0, 0), z_dir=(0, 0, -1))) as redondeo4_piece_4:
        with BuildLine():
            CenterArc((10 - REDONDEO4_R, REDONDEO4_R), REDONDEO4_R, 270, 90)
            Line((10 - REDONDEO4_R, 0), (10, 0))
            Line((10, 0), (10, REDONDEO4_R))
        make_face()
    revolve(axis=Axis((222.06, 65, -33.91), (0, -1, 0)), revolution_arc=90)
    with BuildSketch(Plane(origin=(232.06, 65, -150.67), x_dir=(0, -1, 0), z_dir=(0, 0, 1))) as redondeo4_piece_5:
        with BuildLine():
            CenterArc((REDONDEO4_R, -REDONDEO4_R), REDONDEO4_R, 90, 90)
            Line((0, -REDONDEO4_R), (0, 0))
            Line((0, 0), (REDONDEO4_R, 0))
        make_face()
    extrude(amount=116.76)
    with BuildSketch(Plane(origin=(222.06, 65, -150.67), x_dir=(1, 0, 0), z_dir=(0, 0, 1))) as redondeo4_piece_6:
        with BuildLine():
            CenterArc((10 - REDONDEO4_R, -REDONDEO4_R), REDONDEO4_R, 0, 90)
            Line((10 - REDONDEO4_R, 0), (10, 0))
            Line((10, 0), (10, -REDONDEO4_R))
        make_face()
    revolve(axis=Axis((222.06, 65, -150.67), (0, 1, 0)), revolution_arc=90)

    # Chaflán1
    chafl_n1_edges = [part.edges().sort_by_distance(p)[0] for p in [
        (-233.6, 22, -145.44),
        (-233.6, 22, -59.44),
    ]]
    chamfer(chafl_n1_edges, length=CHAFL_N1_SIZE - 0.0001)  # a hair under: the kernel refuses the full size

    # Redondeo5
    redondeo5_edges = [part.edges().sort_by_distance(p)[0] for p in [
        (-234.6, 38.5, -161.67),
        (-234.6, 38.5, -22.91),
        (233.06, 38.5, -22.91),
        (233.06, 38.5, -161.67),
    ]]
    fillet(redondeo5_edges, radius=REDONDEO5_R)

    # Croquis14 → Saliente-Extruir2 (add)
    with BuildSketch(Plane(origin=(0, 8, 0), x_dir=(1, 0, 0), z_dir=(0, 1, 0)).offset(SALIENTE_EXTRUIR2_START)):
        Polygon((-241, 14.25), (-241, 0), (241, 0), (241, 20.92), (251, 20.92), (251, 181.28), (-256, 181.28), (-256, 14.25), align=None)
        with Locations(Location((-216, 9.875, 0), (0, 0, 270))):
            Circle(CROQUIS14_R, mode=Mode.SUBTRACT)
        with Locations(Location((-216, 171.405, 0), (0, 0, 270))):
            Circle(CROQUIS14_R, mode=Mode.SUBTRACT)
        with Locations(Location((-111.75, 171.405, 0), (0, 0, 270))):
            Circle(CROQUIS14_R, mode=Mode.SUBTRACT)
        with Locations(Location((-5.75, 171.405, 0), (0, 0, 270))):
            Circle(CROQUIS14_R, mode=Mode.SUBTRACT)
        with Locations(Location((111, 171.405, 0), (0, 0, 270))):
            Circle(CROQUIS14_R, mode=Mode.SUBTRACT)
        with Locations(Location((211, 171.405, 0), (0, 0, 270))):
            Circle(CROQUIS14_R, mode=Mode.SUBTRACT)
        with Locations(Location((241.5, 131.28, 0), (0, 0, 270))):
            Circle(CROQUIS14_R, mode=Mode.SUBTRACT)
        with Locations(Location((241.5, 55.92, 0), (0, 0, 270))):
            Circle(CROQUIS14_R, mode=Mode.SUBTRACT)
        with Locations(Location((211, 9.875, 0), (0, 0, 270))):
            Circle(CROQUIS14_R, mode=Mode.SUBTRACT)
        with Locations(Location((111, 9.875, 0), (0, 0, 270))):
            Circle(CROQUIS14_R, mode=Mode.SUBTRACT)
        with Locations(Location((-5.75, 9.875, 0), (0, 0, 270))):
            Circle(CROQUIS14_R, mode=Mode.SUBTRACT)
        with Locations(Location((-111.75, 9.875, 0), (0, 0, 270))):
            Circle(CROQUIS14_R, mode=Mode.SUBTRACT)
        with BuildLine():
            Line((-234.6, 32.91), (-234.6, 151.67))
            ThreePointArc((-234.6, 151.67), (-231.671067812, 158.741067812), (-224.6, 161.67))
            Line((-224.6, 161.67), (223.06, 161.67))
            ThreePointArc((223.06, 161.67), (230.131067812, 158.741067812), (233.06, 151.67))
            Line((233.06, 151.67), (233.06, 32.91))
            ThreePointArc((233.06, 32.91), (230.131067812, 25.838932188), (223.06, 22.91))
            Line((223.06, 22.91), (-224.6, 22.91))
            ThreePointArc((-224.6, 22.91), (-231.671067812, 25.838932188), (-234.6, 32.91))
        make_face(mode=Mode.SUBTRACT)
    extrude(amount=-SALIENTE_EXTRUIR2_DEPTH)

    # Croquis15 → Cortar-Extruir10 (cut)
    with BuildSketch(Plane(origin=(241, 0, 0), x_dir=(0, 0, -1), z_dir=(1, 0, 0))):
        Polygon((0, 8), (10.604436087, 69), (0, 69), align=None)
    extrude(amount=-CORTAR_EXTRUIR10_DEPTH, mode=Mode.SUBTRACT)

    # Croquis16 → Cortar-Extruir11 (cut)
    with BuildSketch(Plane(origin=(251, 0, 0), x_dir=(0, 0, -1), z_dir=(1, 0, 0))):
        Polygon((171.405, 69), (181.28, 69), (181.28, 8), align=None)
    extrude(amount=-CORTAR_EXTRUIR11_DEPTH, mode=Mode.SUBTRACT)

    # Croquis18 → Cortar-Extruir12 (cut)
    with BuildSketch(Plane(origin=(-234.6, 0, 0), x_dir=(0, 0, -1), z_dir=(1, 0, 0)).offset(CORTAR_EXTRUIR12_START)):
        with Locations((136.94, 22)):
            Circle(CROQUIS18_R)
        with Locations((50.94, 22)):
            Circle(CROQUIS18_R)
    extrude(amount=CORTAR_EXTRUIR12_DEPTH, mode=Mode.SUBTRACT)


solid = part.part
